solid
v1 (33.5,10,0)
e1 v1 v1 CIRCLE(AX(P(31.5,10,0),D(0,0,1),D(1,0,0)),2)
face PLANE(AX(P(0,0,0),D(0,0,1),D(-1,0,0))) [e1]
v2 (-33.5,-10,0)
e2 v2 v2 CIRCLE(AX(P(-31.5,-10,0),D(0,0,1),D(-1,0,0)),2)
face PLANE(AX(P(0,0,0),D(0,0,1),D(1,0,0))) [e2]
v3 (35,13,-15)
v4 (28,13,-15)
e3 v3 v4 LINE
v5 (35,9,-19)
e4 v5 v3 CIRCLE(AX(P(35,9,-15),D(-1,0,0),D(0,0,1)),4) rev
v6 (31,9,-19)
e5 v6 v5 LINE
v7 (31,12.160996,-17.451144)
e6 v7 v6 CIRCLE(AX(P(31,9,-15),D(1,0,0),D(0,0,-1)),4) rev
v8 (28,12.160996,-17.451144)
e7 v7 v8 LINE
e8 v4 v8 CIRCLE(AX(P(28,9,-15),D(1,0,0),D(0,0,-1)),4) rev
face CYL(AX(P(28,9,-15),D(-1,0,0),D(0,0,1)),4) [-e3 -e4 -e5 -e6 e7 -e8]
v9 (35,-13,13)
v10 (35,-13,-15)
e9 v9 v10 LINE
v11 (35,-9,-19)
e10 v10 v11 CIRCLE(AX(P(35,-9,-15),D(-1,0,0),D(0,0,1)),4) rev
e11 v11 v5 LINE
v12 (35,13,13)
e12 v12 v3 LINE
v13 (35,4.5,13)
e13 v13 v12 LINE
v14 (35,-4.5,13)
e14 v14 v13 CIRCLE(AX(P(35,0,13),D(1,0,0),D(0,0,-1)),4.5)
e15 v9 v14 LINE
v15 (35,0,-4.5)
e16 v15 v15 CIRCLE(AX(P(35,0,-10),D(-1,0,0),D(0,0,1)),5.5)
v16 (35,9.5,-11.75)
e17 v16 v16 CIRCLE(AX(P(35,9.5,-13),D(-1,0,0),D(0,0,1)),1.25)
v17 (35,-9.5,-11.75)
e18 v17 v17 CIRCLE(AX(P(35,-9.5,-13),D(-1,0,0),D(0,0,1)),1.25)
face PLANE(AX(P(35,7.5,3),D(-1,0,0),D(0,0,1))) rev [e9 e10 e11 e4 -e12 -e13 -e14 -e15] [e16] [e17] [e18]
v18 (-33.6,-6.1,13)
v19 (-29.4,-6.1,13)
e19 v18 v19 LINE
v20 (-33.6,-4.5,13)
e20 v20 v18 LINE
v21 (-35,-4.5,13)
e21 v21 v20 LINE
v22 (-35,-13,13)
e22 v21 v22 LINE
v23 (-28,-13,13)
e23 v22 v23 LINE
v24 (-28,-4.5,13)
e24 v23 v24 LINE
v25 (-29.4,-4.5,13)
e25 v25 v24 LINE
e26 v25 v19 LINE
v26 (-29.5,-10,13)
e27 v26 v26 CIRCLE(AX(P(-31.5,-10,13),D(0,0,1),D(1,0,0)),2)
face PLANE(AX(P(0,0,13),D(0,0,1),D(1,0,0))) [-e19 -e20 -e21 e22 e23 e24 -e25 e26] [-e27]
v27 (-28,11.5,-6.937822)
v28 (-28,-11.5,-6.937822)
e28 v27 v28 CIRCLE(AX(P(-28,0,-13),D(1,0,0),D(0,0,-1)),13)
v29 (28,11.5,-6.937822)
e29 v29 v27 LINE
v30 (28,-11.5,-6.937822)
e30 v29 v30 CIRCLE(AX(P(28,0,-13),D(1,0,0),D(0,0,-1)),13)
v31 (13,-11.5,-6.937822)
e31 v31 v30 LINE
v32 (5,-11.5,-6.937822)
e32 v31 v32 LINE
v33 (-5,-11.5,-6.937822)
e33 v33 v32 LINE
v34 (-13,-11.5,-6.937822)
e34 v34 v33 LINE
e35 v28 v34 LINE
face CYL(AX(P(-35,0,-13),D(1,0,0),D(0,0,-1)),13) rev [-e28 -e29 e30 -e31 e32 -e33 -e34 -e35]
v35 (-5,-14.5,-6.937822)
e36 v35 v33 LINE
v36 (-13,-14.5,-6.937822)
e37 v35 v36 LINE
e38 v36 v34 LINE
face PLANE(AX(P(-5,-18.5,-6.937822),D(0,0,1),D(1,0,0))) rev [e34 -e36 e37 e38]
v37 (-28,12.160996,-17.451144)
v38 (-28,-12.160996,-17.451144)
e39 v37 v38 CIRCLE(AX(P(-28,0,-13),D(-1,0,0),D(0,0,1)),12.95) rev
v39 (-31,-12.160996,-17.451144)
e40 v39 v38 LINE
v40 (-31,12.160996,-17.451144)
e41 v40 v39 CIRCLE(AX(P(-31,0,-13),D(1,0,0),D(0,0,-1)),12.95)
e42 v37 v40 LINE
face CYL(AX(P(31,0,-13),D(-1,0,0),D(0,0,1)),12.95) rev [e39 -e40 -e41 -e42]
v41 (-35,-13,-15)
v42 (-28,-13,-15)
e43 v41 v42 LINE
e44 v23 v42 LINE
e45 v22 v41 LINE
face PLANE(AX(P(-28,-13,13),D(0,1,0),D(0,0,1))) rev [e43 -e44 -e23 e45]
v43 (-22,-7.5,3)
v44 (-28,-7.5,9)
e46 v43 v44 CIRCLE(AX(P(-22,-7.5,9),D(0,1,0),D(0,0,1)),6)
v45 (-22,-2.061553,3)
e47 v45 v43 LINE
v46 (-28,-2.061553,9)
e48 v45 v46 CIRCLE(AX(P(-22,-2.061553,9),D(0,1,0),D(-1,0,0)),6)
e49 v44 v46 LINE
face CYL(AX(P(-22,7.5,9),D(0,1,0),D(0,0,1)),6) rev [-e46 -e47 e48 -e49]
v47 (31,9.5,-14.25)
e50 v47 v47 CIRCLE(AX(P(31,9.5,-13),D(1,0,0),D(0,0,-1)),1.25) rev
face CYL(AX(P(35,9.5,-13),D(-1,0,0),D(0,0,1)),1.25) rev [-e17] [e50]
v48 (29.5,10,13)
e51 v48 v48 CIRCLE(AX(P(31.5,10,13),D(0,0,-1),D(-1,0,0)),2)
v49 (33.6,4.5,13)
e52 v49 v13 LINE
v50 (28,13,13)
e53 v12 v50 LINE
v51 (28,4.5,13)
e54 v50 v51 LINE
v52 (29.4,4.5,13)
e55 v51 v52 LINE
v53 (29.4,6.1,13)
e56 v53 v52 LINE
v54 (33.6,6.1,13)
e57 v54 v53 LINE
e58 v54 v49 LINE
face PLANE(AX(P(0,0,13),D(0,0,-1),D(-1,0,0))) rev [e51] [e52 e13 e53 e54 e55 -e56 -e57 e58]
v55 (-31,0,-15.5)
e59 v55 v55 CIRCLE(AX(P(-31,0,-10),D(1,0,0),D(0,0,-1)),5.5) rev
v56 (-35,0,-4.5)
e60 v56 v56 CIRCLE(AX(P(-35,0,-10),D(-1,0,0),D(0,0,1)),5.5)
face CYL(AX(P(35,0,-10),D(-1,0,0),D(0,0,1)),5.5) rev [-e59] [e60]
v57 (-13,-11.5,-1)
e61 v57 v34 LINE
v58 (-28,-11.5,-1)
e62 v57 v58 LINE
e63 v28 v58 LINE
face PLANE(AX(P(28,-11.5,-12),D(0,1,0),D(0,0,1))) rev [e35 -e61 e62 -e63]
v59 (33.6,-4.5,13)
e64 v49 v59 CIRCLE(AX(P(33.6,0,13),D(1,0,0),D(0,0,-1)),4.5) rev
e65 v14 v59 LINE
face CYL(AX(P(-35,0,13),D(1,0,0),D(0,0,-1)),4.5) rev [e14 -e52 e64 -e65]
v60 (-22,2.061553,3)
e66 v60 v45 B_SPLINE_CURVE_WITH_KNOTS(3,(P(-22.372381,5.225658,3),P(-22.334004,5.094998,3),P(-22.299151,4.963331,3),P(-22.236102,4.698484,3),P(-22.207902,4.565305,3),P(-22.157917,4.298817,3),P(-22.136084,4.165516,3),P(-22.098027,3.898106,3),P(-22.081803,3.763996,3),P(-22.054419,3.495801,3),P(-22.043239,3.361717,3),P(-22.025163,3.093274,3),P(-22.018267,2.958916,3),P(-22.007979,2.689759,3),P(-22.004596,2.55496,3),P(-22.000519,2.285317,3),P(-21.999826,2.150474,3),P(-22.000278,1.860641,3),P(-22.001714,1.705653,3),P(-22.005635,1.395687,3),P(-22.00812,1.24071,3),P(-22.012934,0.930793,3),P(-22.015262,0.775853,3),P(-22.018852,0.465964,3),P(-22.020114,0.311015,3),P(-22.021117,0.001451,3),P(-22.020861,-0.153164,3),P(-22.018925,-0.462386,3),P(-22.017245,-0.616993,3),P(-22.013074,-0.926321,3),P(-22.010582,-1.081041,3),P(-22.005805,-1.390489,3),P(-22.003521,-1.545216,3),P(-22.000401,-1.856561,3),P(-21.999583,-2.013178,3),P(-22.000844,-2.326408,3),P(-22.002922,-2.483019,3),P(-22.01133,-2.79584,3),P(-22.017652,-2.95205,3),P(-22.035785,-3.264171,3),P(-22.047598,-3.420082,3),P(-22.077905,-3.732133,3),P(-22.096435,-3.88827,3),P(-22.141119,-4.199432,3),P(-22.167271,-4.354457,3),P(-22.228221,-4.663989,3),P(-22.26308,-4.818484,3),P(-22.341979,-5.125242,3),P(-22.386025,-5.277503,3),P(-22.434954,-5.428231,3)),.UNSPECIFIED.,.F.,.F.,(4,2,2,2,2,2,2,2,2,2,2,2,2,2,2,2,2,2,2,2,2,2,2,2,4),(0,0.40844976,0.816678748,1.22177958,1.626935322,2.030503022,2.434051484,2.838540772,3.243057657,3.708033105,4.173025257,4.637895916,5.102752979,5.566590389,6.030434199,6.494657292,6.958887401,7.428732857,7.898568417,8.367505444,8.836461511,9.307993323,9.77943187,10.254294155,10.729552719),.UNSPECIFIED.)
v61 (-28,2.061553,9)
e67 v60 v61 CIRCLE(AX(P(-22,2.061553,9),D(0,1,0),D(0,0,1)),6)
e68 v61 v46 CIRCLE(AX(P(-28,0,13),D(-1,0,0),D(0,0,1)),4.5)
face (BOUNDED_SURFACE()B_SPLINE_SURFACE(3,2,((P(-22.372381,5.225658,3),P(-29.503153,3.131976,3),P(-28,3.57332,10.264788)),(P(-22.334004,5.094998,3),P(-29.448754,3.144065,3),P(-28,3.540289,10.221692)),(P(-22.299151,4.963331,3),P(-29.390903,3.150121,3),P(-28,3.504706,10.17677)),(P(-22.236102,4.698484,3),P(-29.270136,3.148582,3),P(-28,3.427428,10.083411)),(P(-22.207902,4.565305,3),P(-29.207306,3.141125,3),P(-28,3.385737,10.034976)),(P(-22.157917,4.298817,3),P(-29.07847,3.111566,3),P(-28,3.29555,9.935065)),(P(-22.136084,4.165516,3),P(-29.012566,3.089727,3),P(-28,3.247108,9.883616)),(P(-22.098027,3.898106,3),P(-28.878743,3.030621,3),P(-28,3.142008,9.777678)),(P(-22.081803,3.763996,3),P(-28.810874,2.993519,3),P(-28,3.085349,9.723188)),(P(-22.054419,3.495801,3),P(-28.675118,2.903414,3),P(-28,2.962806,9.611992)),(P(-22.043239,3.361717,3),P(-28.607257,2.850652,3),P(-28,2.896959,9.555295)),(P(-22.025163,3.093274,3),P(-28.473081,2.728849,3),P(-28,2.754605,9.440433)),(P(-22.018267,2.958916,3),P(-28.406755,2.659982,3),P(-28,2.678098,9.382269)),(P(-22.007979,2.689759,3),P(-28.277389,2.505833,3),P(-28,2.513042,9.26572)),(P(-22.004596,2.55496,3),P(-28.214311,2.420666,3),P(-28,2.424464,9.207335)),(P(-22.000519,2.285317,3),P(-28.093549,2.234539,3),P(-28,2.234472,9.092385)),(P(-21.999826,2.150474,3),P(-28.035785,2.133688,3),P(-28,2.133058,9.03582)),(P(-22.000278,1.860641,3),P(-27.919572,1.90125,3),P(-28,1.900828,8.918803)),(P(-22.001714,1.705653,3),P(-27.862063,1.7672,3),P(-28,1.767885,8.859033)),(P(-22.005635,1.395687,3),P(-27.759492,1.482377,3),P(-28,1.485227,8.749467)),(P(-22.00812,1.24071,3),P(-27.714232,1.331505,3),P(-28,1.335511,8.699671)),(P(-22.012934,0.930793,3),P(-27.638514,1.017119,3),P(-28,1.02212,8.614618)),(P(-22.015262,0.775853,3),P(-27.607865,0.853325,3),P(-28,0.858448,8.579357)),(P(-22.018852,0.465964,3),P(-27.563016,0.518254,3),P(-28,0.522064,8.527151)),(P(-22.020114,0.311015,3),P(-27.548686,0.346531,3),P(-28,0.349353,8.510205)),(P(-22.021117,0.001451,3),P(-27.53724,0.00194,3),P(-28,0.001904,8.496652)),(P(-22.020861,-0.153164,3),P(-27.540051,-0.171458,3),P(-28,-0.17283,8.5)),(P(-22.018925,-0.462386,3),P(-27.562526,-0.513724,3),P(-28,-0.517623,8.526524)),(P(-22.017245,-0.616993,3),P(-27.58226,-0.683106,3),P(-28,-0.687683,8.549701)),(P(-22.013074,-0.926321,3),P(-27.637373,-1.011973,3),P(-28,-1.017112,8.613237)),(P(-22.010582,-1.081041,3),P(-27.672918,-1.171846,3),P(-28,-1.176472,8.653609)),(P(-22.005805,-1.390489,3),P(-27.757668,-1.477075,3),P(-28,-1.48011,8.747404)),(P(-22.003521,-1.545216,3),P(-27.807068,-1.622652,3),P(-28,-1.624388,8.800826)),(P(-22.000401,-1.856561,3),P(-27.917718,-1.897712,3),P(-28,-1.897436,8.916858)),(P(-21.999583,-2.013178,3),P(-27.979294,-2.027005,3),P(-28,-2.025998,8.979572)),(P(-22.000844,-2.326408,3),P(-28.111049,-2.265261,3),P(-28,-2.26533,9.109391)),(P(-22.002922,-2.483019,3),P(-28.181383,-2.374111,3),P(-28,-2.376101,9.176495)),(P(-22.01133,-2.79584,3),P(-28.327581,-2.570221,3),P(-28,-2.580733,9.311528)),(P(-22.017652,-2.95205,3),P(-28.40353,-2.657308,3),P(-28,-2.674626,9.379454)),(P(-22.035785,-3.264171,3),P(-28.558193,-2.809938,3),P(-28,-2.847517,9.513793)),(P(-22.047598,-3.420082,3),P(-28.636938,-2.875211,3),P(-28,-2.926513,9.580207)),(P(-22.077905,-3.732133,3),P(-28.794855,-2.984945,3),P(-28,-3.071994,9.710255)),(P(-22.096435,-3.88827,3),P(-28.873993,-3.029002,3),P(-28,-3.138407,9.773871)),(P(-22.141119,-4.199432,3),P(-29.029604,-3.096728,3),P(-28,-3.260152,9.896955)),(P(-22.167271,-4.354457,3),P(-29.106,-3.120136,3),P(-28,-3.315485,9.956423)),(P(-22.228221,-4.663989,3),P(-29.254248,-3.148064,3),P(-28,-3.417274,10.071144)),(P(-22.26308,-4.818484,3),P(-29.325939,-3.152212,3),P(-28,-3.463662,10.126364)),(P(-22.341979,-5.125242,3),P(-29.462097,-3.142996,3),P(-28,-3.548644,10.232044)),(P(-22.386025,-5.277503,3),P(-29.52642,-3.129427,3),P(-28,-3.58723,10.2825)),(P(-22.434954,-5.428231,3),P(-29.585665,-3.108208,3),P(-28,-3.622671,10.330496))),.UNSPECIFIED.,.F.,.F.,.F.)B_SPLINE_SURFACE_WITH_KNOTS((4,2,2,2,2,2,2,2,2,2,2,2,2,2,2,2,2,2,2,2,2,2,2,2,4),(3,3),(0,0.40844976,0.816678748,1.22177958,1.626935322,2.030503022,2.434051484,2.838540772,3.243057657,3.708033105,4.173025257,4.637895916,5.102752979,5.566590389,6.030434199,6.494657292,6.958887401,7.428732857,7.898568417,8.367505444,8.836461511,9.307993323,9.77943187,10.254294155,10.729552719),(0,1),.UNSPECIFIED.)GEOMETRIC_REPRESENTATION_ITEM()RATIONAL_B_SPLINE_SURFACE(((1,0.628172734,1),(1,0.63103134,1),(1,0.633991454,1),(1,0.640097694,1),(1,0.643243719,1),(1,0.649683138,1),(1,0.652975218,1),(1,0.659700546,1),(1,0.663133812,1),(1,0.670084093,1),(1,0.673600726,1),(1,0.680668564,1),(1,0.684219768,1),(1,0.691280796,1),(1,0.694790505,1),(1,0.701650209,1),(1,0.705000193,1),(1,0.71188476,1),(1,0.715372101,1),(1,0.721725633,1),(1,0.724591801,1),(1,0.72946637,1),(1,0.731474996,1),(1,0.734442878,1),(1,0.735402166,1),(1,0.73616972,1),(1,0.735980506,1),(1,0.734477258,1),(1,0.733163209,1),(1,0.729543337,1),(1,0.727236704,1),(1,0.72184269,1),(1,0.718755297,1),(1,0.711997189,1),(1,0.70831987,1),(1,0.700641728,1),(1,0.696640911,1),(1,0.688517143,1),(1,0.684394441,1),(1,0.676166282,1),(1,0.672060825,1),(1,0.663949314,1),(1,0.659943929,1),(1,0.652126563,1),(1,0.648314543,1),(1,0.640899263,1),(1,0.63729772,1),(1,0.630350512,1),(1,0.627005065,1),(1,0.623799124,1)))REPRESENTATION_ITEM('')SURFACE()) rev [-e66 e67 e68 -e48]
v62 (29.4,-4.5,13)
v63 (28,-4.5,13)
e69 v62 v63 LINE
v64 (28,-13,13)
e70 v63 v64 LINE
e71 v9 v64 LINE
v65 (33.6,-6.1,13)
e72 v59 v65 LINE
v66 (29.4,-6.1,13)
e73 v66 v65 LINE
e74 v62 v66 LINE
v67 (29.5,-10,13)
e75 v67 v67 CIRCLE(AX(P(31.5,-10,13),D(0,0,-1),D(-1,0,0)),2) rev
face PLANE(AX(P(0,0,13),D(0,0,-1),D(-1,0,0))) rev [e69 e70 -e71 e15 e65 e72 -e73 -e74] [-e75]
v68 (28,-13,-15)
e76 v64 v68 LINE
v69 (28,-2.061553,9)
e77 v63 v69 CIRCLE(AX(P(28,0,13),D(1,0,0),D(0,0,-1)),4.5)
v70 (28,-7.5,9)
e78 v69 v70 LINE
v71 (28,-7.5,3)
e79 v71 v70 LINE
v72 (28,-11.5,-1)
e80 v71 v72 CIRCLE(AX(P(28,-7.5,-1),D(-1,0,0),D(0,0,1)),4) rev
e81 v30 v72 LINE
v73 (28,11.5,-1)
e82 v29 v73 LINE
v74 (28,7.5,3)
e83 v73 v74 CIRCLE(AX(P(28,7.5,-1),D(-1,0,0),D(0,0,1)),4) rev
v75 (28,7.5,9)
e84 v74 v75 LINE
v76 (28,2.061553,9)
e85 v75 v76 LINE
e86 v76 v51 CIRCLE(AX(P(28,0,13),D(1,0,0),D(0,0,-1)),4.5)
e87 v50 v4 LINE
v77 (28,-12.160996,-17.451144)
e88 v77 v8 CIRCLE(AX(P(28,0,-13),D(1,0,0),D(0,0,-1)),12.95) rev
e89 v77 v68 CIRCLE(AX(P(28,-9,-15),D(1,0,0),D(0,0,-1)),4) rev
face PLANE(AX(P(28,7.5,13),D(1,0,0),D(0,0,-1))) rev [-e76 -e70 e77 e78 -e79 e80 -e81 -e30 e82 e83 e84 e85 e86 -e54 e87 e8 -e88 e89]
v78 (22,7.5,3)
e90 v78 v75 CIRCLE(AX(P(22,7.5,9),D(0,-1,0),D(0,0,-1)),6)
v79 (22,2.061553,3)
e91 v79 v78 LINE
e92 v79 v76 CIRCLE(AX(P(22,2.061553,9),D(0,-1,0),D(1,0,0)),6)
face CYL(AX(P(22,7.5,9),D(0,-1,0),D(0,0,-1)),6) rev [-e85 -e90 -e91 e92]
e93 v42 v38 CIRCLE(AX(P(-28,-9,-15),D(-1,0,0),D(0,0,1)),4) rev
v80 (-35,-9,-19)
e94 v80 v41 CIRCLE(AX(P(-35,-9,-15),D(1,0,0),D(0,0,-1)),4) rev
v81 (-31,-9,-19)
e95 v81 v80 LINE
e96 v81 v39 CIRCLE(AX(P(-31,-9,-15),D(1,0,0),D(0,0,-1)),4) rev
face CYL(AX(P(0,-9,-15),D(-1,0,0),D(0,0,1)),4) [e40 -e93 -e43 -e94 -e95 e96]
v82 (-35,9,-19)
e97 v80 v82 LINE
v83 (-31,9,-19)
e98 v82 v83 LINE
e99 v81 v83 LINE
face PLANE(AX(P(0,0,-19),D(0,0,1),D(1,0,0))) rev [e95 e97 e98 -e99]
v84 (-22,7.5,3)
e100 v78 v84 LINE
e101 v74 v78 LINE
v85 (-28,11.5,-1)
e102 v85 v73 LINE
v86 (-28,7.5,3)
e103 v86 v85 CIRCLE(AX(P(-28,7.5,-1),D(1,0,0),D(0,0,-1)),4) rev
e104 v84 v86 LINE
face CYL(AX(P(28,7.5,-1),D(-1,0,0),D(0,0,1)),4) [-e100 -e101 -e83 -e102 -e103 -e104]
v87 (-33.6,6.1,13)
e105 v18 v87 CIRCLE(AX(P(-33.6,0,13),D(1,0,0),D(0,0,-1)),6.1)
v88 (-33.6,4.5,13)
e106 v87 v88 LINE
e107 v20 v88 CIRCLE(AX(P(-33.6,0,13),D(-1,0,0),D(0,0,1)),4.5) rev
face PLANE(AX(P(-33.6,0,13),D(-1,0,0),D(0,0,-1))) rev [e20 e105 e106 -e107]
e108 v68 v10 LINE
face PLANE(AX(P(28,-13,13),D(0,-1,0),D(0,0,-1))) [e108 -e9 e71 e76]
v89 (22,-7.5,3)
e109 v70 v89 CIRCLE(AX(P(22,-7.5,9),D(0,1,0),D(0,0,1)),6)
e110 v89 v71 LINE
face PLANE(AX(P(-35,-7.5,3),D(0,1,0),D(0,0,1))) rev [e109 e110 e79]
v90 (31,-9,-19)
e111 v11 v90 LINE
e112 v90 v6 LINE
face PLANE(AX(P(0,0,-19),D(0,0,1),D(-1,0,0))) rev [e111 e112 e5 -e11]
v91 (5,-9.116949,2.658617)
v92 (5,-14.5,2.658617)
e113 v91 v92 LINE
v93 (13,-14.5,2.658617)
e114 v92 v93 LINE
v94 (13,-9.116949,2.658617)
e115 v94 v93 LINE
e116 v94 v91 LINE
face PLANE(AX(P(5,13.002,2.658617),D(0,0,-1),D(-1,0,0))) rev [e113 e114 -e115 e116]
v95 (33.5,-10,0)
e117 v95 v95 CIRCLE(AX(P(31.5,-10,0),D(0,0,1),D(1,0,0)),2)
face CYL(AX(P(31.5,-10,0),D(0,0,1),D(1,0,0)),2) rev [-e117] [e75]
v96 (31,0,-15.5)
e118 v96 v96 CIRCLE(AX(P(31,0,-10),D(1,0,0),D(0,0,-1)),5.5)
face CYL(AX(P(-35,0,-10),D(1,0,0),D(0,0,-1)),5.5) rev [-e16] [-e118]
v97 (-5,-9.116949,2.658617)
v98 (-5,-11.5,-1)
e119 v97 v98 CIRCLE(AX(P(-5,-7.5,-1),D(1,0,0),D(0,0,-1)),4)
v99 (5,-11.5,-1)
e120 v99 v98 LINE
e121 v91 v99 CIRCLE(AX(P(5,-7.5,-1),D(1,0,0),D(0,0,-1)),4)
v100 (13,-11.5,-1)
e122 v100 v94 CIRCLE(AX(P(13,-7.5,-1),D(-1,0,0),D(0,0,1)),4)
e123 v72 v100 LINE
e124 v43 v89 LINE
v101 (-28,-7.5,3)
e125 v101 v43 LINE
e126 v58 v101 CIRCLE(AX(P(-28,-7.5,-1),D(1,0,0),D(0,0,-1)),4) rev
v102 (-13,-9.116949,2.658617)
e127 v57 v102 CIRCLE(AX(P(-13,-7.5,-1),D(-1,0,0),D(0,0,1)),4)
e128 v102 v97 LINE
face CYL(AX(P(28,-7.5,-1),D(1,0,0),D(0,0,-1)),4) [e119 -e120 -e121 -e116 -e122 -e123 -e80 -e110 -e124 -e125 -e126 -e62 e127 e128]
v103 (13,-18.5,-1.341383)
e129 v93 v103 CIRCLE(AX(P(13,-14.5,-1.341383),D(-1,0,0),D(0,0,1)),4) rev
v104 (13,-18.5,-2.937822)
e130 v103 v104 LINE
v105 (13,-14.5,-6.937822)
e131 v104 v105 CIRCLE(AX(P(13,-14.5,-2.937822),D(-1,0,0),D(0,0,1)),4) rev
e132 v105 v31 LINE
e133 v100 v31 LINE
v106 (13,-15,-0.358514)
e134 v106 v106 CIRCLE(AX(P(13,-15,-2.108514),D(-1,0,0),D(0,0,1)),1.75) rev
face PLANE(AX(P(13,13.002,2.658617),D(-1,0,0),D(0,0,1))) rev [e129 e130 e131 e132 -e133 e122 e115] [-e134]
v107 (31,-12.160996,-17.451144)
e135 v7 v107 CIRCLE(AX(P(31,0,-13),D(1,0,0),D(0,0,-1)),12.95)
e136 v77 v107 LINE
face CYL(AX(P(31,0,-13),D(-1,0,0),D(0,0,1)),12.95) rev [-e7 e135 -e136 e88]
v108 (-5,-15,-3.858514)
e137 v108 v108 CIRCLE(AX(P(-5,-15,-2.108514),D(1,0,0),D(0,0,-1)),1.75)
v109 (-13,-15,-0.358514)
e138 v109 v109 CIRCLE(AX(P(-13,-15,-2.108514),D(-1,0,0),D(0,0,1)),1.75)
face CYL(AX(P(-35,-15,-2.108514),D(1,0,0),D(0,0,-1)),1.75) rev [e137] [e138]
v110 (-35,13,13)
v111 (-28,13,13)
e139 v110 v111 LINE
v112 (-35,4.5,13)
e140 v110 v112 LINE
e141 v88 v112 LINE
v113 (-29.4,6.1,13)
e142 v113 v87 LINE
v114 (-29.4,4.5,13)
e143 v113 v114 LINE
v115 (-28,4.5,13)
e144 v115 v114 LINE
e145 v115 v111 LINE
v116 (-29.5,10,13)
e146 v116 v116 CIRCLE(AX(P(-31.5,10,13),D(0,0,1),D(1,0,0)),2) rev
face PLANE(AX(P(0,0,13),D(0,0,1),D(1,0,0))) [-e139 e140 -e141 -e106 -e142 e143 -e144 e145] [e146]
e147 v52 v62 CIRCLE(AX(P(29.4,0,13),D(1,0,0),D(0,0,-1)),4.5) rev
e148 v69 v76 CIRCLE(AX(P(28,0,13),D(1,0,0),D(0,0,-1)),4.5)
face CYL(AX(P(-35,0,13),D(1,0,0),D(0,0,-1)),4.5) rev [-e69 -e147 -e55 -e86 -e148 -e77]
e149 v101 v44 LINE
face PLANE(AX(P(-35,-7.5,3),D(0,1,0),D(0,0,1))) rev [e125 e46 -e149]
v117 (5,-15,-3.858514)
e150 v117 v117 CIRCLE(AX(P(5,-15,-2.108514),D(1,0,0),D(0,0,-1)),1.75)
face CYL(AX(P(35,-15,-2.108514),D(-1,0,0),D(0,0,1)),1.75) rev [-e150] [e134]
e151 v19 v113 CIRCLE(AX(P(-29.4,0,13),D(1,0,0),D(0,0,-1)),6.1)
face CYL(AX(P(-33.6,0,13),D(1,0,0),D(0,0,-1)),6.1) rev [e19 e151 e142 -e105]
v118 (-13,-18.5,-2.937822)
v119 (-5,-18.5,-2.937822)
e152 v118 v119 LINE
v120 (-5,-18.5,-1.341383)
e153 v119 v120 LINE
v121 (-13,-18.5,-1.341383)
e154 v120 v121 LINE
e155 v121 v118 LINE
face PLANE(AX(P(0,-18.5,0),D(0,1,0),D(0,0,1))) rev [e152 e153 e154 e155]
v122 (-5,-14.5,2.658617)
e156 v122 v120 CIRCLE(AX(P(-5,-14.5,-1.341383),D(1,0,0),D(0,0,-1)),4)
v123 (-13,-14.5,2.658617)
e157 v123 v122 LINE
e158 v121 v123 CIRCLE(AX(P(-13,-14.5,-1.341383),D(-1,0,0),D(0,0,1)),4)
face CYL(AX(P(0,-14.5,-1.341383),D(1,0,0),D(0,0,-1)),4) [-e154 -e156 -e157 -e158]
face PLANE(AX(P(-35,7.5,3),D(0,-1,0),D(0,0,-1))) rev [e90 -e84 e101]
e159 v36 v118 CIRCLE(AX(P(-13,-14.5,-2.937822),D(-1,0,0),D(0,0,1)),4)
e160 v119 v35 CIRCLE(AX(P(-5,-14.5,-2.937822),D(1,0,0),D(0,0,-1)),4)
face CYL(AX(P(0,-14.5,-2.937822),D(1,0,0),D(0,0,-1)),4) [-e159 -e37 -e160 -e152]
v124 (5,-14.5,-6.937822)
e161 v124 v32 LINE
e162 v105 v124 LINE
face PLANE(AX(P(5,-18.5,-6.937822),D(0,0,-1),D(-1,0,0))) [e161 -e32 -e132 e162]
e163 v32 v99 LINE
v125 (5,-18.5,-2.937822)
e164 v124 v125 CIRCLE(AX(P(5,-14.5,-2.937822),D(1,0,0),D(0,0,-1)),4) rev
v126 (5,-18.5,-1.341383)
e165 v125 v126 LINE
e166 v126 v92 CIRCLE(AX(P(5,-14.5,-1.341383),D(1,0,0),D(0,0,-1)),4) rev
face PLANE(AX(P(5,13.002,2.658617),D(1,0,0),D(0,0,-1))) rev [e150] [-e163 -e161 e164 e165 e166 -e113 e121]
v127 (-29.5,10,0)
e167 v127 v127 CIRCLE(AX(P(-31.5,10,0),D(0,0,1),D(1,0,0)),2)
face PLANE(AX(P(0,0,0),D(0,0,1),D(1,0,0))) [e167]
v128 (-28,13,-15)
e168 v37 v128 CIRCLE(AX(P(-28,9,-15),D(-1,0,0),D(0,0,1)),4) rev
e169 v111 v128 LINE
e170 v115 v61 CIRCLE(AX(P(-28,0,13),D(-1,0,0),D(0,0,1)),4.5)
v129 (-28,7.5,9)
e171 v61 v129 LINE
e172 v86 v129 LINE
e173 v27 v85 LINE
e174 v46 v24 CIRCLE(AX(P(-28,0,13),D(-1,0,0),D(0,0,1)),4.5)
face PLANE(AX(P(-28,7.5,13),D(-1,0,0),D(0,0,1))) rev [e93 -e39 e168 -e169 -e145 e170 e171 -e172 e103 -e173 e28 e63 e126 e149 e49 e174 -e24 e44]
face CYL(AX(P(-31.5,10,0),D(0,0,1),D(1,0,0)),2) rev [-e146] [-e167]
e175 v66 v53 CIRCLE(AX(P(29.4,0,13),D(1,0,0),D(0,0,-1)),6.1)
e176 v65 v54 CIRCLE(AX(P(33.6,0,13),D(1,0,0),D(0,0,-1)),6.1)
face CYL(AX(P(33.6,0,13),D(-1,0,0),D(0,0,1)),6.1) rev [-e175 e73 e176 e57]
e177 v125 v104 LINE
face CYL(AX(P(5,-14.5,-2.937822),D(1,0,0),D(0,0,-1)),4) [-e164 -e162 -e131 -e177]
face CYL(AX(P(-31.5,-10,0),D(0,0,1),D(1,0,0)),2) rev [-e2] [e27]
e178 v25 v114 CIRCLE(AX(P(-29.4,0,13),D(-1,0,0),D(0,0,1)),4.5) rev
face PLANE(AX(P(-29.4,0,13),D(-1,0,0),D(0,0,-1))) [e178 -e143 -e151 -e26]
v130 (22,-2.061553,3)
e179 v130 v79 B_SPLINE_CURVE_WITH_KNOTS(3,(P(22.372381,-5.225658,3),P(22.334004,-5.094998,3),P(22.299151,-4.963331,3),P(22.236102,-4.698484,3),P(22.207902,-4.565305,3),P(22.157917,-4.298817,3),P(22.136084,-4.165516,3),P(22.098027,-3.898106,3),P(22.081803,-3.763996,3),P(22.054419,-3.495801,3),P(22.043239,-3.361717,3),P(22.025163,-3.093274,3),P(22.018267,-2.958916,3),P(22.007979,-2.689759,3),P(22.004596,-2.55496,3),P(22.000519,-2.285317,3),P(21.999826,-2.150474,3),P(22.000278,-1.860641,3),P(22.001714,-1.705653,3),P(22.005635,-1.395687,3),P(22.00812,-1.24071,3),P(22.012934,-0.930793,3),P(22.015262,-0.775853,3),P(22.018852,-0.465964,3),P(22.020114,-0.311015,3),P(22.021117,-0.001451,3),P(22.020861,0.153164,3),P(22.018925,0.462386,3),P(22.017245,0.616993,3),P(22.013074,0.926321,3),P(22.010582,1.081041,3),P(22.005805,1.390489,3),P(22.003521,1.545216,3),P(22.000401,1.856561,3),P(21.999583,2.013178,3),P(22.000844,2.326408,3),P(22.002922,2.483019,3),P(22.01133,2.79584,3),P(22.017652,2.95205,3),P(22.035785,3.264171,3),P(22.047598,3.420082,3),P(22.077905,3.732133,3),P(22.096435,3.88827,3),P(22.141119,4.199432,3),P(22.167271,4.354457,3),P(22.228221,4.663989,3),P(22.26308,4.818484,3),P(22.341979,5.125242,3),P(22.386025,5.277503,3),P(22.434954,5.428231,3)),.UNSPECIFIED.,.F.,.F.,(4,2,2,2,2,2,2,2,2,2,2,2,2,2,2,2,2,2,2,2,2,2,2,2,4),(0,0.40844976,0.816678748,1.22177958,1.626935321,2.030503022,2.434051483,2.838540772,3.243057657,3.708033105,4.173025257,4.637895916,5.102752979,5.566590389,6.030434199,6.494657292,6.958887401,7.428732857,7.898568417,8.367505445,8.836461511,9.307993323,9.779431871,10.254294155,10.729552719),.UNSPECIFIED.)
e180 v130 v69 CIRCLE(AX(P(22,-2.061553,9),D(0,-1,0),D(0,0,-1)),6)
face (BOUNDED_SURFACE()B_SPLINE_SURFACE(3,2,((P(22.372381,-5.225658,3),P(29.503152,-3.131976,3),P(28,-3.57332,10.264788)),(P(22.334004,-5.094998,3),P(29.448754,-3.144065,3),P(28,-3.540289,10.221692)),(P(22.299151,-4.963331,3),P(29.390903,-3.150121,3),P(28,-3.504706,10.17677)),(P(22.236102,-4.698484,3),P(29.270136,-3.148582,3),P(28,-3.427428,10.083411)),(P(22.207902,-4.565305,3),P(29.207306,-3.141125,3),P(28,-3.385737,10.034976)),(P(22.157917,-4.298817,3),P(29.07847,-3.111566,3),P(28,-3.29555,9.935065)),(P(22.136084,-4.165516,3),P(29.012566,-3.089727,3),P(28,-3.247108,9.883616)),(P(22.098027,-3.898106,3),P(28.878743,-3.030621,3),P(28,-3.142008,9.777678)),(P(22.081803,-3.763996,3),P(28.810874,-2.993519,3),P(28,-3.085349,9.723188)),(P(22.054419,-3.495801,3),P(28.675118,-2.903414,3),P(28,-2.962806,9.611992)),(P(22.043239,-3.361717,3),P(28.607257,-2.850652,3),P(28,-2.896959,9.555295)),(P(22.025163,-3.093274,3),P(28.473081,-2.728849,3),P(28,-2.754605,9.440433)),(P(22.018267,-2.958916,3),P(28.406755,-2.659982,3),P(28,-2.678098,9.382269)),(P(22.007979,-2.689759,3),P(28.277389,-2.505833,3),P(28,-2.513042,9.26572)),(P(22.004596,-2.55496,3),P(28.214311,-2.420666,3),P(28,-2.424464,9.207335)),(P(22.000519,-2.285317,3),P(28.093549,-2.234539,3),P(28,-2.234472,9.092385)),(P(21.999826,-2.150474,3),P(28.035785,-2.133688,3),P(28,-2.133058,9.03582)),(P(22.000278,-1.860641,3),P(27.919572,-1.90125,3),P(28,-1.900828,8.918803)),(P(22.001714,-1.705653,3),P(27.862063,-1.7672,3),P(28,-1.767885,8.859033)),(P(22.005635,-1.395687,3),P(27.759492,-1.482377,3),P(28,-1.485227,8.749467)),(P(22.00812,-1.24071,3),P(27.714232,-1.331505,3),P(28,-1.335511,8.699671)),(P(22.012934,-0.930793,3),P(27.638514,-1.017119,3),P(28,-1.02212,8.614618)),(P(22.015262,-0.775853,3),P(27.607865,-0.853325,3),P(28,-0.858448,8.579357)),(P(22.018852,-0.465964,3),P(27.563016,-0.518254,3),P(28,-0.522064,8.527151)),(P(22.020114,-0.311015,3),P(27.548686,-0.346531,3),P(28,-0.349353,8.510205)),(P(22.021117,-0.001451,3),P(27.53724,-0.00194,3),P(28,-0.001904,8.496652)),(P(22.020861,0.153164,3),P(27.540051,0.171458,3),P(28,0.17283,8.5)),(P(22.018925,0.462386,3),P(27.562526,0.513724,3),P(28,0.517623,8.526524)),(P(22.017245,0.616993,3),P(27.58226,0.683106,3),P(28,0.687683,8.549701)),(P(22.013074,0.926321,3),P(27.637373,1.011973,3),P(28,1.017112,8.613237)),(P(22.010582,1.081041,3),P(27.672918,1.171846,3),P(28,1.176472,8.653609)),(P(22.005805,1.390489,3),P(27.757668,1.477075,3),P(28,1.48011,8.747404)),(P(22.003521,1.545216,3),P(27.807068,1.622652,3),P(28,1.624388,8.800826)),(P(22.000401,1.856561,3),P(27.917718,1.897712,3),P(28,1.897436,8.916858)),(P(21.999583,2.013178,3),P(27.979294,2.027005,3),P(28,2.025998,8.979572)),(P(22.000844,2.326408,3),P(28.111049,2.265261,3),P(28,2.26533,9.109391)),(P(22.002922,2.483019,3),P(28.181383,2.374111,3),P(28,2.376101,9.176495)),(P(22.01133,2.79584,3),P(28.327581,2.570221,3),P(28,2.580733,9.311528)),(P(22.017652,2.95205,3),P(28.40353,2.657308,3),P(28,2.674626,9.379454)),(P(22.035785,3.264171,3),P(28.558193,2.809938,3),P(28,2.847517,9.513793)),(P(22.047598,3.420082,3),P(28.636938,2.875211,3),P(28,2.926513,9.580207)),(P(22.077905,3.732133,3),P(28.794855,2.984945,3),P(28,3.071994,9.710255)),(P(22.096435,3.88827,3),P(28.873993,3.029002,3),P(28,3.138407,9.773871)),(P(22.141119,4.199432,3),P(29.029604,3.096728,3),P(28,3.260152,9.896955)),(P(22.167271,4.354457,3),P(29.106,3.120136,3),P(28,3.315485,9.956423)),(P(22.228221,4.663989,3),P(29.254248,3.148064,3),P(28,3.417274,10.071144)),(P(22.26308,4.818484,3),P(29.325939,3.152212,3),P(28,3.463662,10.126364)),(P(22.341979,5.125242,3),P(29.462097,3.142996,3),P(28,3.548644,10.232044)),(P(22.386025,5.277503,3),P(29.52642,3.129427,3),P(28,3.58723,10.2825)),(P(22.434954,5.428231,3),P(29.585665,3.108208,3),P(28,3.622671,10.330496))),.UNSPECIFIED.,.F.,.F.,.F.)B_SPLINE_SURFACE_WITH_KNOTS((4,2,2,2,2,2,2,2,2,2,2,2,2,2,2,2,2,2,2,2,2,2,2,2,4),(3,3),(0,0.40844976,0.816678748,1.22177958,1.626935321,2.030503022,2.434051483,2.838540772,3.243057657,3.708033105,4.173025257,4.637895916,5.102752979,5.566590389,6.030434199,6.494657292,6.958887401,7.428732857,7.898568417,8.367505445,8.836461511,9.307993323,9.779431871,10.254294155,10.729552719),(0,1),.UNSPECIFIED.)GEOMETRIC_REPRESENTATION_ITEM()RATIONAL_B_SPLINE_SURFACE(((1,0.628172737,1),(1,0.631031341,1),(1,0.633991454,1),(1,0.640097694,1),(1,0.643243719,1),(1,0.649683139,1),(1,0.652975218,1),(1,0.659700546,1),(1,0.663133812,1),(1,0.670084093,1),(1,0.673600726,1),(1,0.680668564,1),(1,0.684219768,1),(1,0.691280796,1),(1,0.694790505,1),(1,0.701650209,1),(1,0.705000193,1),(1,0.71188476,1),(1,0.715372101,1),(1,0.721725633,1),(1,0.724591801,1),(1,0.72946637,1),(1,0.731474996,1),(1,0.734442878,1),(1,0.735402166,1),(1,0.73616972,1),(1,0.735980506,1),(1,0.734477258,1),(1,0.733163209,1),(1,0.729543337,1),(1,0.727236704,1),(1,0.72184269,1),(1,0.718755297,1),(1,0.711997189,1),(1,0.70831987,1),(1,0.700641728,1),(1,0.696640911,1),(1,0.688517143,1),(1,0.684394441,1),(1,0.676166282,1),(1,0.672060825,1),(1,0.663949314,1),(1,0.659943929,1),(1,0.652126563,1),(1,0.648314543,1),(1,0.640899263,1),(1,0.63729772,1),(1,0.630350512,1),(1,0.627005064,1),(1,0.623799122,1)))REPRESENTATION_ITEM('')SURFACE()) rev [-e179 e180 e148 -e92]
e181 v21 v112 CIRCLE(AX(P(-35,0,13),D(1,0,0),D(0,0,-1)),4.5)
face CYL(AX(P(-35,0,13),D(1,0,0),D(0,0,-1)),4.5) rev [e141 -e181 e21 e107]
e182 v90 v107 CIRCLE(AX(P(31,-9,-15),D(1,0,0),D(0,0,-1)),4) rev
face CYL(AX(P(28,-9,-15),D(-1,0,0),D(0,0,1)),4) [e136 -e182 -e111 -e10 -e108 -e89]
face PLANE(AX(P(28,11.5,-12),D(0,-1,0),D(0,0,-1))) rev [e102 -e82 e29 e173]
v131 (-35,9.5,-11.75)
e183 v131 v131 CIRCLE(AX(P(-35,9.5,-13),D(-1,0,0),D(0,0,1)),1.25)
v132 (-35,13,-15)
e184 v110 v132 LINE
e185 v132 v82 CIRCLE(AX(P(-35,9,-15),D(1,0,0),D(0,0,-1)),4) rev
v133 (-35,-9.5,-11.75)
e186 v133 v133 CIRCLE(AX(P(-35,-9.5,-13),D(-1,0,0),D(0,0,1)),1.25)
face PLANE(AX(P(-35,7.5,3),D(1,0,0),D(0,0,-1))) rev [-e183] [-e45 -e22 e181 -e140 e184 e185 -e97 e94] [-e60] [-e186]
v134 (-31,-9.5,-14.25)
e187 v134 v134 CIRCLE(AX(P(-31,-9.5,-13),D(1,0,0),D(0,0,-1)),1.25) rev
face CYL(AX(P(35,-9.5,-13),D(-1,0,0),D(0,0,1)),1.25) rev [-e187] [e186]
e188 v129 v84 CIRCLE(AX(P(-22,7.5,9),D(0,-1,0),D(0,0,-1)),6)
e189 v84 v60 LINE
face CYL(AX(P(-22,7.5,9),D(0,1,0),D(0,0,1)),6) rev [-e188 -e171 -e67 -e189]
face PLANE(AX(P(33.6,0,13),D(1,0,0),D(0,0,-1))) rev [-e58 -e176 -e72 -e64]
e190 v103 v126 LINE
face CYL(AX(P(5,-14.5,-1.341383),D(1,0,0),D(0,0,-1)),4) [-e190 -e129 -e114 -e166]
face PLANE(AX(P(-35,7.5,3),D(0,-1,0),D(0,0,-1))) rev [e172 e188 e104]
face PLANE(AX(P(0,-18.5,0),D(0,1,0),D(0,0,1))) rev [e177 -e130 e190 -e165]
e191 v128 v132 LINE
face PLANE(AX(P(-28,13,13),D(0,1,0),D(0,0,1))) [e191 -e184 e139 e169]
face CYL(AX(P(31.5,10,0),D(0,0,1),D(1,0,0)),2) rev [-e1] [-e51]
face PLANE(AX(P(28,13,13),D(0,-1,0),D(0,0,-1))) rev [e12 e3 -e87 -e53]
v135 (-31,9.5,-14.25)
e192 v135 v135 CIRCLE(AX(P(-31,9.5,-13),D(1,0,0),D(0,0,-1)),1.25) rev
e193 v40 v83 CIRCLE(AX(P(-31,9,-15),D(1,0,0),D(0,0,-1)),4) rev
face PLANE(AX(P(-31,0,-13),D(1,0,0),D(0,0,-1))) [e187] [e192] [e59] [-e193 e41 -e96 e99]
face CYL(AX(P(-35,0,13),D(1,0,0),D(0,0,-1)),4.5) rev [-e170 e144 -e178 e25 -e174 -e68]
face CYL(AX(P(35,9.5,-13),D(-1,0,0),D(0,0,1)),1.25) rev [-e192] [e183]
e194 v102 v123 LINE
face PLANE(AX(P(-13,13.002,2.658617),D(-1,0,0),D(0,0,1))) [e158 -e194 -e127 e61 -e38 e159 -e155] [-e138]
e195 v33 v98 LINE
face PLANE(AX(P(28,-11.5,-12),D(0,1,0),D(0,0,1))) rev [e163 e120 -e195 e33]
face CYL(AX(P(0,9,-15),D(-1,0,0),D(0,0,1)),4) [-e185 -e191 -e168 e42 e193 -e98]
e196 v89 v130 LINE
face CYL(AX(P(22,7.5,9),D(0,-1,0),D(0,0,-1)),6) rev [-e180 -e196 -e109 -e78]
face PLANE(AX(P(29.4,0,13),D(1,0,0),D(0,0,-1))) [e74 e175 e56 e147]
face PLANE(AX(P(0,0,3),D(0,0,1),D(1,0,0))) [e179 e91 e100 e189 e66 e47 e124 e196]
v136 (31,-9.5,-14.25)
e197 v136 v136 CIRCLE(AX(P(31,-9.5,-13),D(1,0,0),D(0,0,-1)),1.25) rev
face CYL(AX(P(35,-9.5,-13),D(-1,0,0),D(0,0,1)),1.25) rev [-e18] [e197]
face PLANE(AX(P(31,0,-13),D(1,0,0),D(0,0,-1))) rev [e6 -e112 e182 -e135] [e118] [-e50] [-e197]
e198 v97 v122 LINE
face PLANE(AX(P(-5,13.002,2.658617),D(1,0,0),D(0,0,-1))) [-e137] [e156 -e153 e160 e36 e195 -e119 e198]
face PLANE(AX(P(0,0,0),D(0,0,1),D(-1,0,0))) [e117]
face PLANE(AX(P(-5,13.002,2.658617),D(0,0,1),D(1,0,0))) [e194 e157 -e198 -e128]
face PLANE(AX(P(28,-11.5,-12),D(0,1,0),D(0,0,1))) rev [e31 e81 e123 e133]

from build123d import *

# Parameters (mm, degrees)
SKETCH1_W                                  = 70
SKETCH1_H                                  = 15
BOSS_EXTRUDE1_DEPTH                        = 3
SKETCH2_W                                  = 7
SKETCH2_H                                  = 15
BOSS_EXTRUDE2_DEPTH                        = 10
SKETCH5_R                                  = 4.5
CUT_EXTRUDE1_DEPTH                         = 72.590851371
SKETCH6_R                                  = 6.1
CUT_EXTRUDE4_DEPTH                         = 2.1
BOSS_EXTRUDE3_DEPTH                        = 13
SKETCH8_R                                  = 2
CUT_EXTRUDE5_DEPTH                         = 40.534794802
SKETCH9_R                                  = 1.75
CUT_EXTRUDE6_DEPTH                         = 39.65229618
MIRROR1_AT_THE_SECOND_PLANE_COPY_1_SKETC_R = 6.1
MIRROR1_AT_THE_SECOND_PLANE_COPY_1_DEPTH   = 2.1
MIRROR1_AT_THE_SECOND_PLANE_COPY_2_DEPTH   = 13
MIRROR1_AT_THE_SECOND_PLANE_COPY_3_SKETC_R = 2
MIRROR1_AT_THE_SECOND_PLANE_COPY_3_DEPTH   = 40.534794802
MIRROR1_AT_THE_SECOND_PLANE_COPY_4_SKETC_R = 1.75
MIRROR1_AT_THE_SECOND_PLANE_COPY_4_DEPTH   = 39.65229618
FILLET1_R                                  = 6
SKETCH10_W                                 = 56
SKETCH10_H                                 = 23
BOSS_EXTRUDE4_DEPTH                        = 15
FILLET2_R                                  = 4
SKETCH11_R                                 = 13
CUT_EXTRUDE7_DEPTH                         = 66.627738058
SKETCH12_W                                 = 8
SKETCH12_H                                 = 9.596439054
BOSS_EXTRUDE5_DEPTH                        = 7
BOSS_EXTRUDE5_DIRECTION_2_REACH            = 46.657
FILLET3_R                                  = 4
SKETCH13_R                                 = 1.75
CUT_EXTRUDE8_DEPTH                         = 46.948340586
SKETCH14_W                                 = 7
SKETCH14_H                                 = 26
BOSS_EXTRUDE6_DEPTH                        = 5
SKETCH15_W                                 = 7
SKETCH15_H                                 = 26
BOSS_EXTRUDE7_DEPTH                        = 14
FILLET5_R                                  = 4
SKETCH16_R                                 = 5.5
CUT_EXTRUDE9_DEPTH                         = 75.854859562
FILLET3_OF_MIRROR2_R                       = 4
FILLET5_OF_MIRROR2_R                       = 4
SKETCH17_R                                 = 1.25
CUT_EXTRUDE10_DEPTH                        = 75.854859562
CUT_EXTRUDE14_DEPTH                        = 31
CUT_EXTRUDE14_DEPTH_BACK                   = 31
SKETCH18_R                                 = 12.95


with BuildPart() as part:
    # Sketch1 → Boss-Extrude1 (new body)
    with BuildSketch(Plane.XY):
        Rectangle(SKETCH1_W, SKETCH1_H)
    extrude(amount=BOSS_EXTRUDE1_DEPTH)

    # Sketch2 → Boss-Extrude2 (add)
    with BuildSketch(Plane.XY.offset(3)):
        with Locations((-31.5, 0)):
            Rectangle(SKETCH2_W, SKETCH2_H)
        with Locations((31.5, 0)):
            Rectangle(SKETCH2_W, SKETCH2_H)
    extrude(amount=BOSS_EXTRUDE2_DEPTH)

    # Sketch5 → Cut-Extrude1 (cut, through all)
    with BuildSketch(Plane(origin=(35, 0, 0), x_dir=(0, 0, -1), z_dir=(1, 0, 0))):
        with Locations((-13, 0)):
            Circle(SKETCH5_R)
    extrude(amount=-CUT_EXTRUDE1_DEPTH, mode=Mode.SUBTRACT)

    # Sketch6 → Cut-Extrude4 (cut, symmetric)
    with BuildSketch(Plane(origin=(31.5, 0, 0), x_dir=(0, 0, -1), z_dir=(1, 0, 0))):
        with Locations((-13, 0)):
            Circle(SKETCH6_R)
    cut_extrude4 = extrude(amount=CUT_EXTRUDE4_DEPTH, both=True, mode=Mode.SUBTRACT)

    # Sketch7 → Boss-Extrude3 (add)
    with BuildSketch(Plane.XY):
        Polygon((28, 8.1), (28, 13), (35, 13), (35, 8.1), (35, 4.5), (33.6, 4.5), (33.6, 6.1), (29.4, 6.1), (29.4, 4.5), (28, 4.5), align=None)
    boss_extrude3 = extrude(amount=BOSS_EXTRUDE3_DEPTH)

    # Sketch8 → Cut-Extrude5 (cut, symmetric)
    with BuildSketch(Plane.XY.offset(13)):
        with Locations((31.5, 10)):
            Circle(SKETCH8_R)
    cut_extrude5 = extrude(amount=CUT_EXTRUDE5_DEPTH, both=True, mode=Mode.SUBTRACT)

    # Sketch9 → Cut-Extrude6 (cut, through all)
    with BuildSketch(Plane.XY.offset(3)):
        with Locations((-10, -4)):
            Circle(SKETCH9_R)
    cut_extrude6 = extrude(amount=-CUT_EXTRUDE6_DEPTH, mode=Mode.SUBTRACT)

    # Mirror1: Cut-Extrude4, Boss-Extrude3, Cut-Extrude5, Cut-Extrude6 across plane
    add(cut_extrude4.mirror(Plane(origin=(0, 0, 0), x_dir=(0, 0, 1), z_dir=(1, 0, 0))), mode=Mode.SUBTRACT)
    add(boss_extrude3.mirror(Plane(origin=(0, 0, 0), x_dir=(0, 0, 1), z_dir=(1, 0, 0))))
    add(cut_extrude5.mirror(Plane(origin=(0, 0, 0), x_dir=(0, 0, 1), z_dir=(1, 0, 0))), mode=Mode.SUBTRACT)
    add(cut_extrude6.mirror(Plane(origin=(0, 0, 0), x_dir=(0, 0, 1), z_dir=(1, 0, 0))), mode=Mode.SUBTRACT)

    # Mirror1 at the second plane: Cut-Extrude4, Boss-Extrude3, Cut-Extrude5, Cut-Extrude6 across plane
    add(cut_extrude4.mirror(Plane.ZX), mode=Mode.SUBTRACT)
    add(boss_extrude3.mirror(Plane.ZX))
    add(cut_extrude5.mirror(Plane.ZX), mode=Mode.SUBTRACT)
    add(cut_extrude6.mirror(Plane.ZX), mode=Mode.SUBTRACT)

    # Mirror1 at the second plane copy 1 sketc → Mirror1 at the second plane copy 1 (cut, symmetric)
    with BuildSketch(Plane(origin=(-31.5, 0, 0), x_dir=(0, 0, -1), z_dir=(-1, 0, 0))):
        with Locations((-13, 0)):
            Circle(MIRROR1_AT_THE_SECOND_PLANE_COPY_1_SKETC_R)
    extrude(amount=MIRROR1_AT_THE_SECOND_PLANE_COPY_1_DEPTH, both=True, mode=Mode.SUBTRACT)

    # Mirror1 at the second plane copy 2 sketc → Mirror1 at the second plane copy 2 (add)
    with BuildSketch(Plane(origin=(0, 0, 0), x_dir=(-1, 0, 0), z_dir=(0, 0, 1))):
        Polygon((28, 8.1), (28, 13), (35, 13), (35, 8.1), (35, 4.5), (33.6, 4.5), (33.6, 6.1), (29.4, 6.1), (29.4, 4.5), (28, 4.5), align=None)
    extrude(amount=MIRROR1_AT_THE_SECOND_PLANE_COPY_2_DEPTH)

    # Mirror1 at the second plane copy 3 sketc → Mirror1 at the second plane copy 3 (cut, symmetric)
    with BuildSketch(Plane(origin=(0, 0, 13), x_dir=(-1, 0, 0), z_dir=(0, 0, 1))):
        with Locations((31.5, 10)):
            Circle(MIRROR1_AT_THE_SECOND_PLANE_COPY_3_SKETC_R)
    extrude(amount=MIRROR1_AT_THE_SECOND_PLANE_COPY_3_DEPTH, both=True, mode=Mode.SUBTRACT)

    # Mirror1 at the second plane copy 4 sketc → Mirror1 at the second plane copy 4 (cut, through all)
    with BuildSketch(Plane(origin=(0, 0, 3), x_dir=(-1, 0, 0), z_dir=(0, 0, 1))):
        with Locations((-10, -4)):
            Circle(MIRROR1_AT_THE_SECOND_PLANE_COPY_4_SKETC_R)
    extrude(amount=-MIRROR1_AT_THE_SECOND_PLANE_COPY_4_DEPTH, mode=Mode.SUBTRACT)

    # Fillet1
    fillet1_edges = [part.edges().sort_by_distance(p)[0] for p in [
        (-28, 0, 3),
        (28, 0, 3),
    ]]
    fillet(fillet1_edges, radius=FILLET1_R)

    # Sketch10 → Boss-Extrude4 (add)
    with BuildSketch(Plane(origin=(0, 0, 3), x_dir=(-1, 0, 0), z_dir=(0, 0, -1))):
        Rectangle(SKETCH10_W, SKETCH10_H)
    extrude(amount=BOSS_EXTRUDE4_DEPTH)

    # Fillet2
    # the kernel refuses this fillet: 4 mm, written as the material it takes off along each edge
    with BuildSketch(Plane(origin=(-28, 11.5, 3), x_dir=(0, 0, -1), z_dir=(1, 0, 0)), Plane(origin=(28, -11.5, 3), x_dir=(0, 0, -1), z_dir=(-1, 0, 0))) as fillet2_piece_1:
        with BuildLine():
            CenterArc((FILLET2_R, -FILLET2_R), FILLET2_R, 90, 90)
            Line((0, -FILLET2_R), (0, 0))
            Line((0, 0), (FILLET2_R, 0))
        make_face()
    extrude(amount=56, mode=Mode.SUBTRACT)

    # Sketch11 → Cut-Extrude7 (cut, through all)
    with BuildSketch(Plane(origin=(28, 0, 0), x_dir=(0, 0, -1), z_dir=(1, 0, 0))):
        with Locations((13, 0)):
            Circle(SKETCH11_R)
    extrude(amount=-CUT_EXTRUDE7_DEPTH, mode=Mode.SUBTRACT)

    # Sketch12 → Boss-Extrude5 (add)
    with BuildSketch(Plane.XZ.offset(11.5)):
        with Locations((-9, -2.139602647)):
            Rectangle(SKETCH12_W, SKETCH12_H)
    boss_extrude5 = extrude(amount=BOSS_EXTRUDE5_DEPTH)

    # Sketch12 → Boss-Extrude5 direction 2 (add, up to next)
    with BuildSketch(Plane.XZ.offset(11.5), mode=Mode.PRIVATE) as boss_extrude5_direction_2_sk1:
        with Locations((-9, -2.139602647)):
            Rectangle(SKETCH12_W, SKETCH12_H)
    boss_extrude5_direction_2_tool1 = extrude(boss_extrude5_direction_2_sk1.sketch, amount=-BOSS_EXTRUDE5_DIRECTION_2_REACH, mode=Mode.PRIVATE) - part.part
    boss_extrude5_direction_2 = boss_extrude5_direction_2_tool1.solids().sort_by_distance((-9, -11.5, -2.139603))[0]
    add(boss_extrude5_direction_2)

    # Fillet3
    fillet3_edges = [part.edges().sort_by_distance(p)[0] for p in [
        (-9, -18.5, 2.65861688),
        (-9, -18.5, -6.937822174),
    ]]
    fillet(fillet3_edges, radius=FILLET3_R)

    # Sketch13 → Cut-Extrude8 (cut, through all)
    with BuildSketch(Plane(origin=(-5, 0, 0), x_dir=(0, 0, -1), z_dir=(1, 0, 0))):
        with Locations((2.108513734, -15)):
            Circle(SKETCH13_R)
    cut_extrude8 = extrude(amount=-CUT_EXTRUDE8_DEPTH, mode=Mode.SUBTRACT)

    # Sketch14 → Boss-Extrude6 (add)
    with BuildSketch(Plane(origin=(0, 0, 0), x_dir=(-1, 0, 0), z_dir=(0, 0, -1))):
        with Locations((31.5, 0)):
            Rectangle(SKETCH14_W, SKETCH14_H)
    boss_extrude6 = extrude(amount=BOSS_EXTRUDE6_DEPTH)

    # Sketch15 → Boss-Extrude7 (add)
    with BuildSketch(Plane(origin=(0, 0, -5), x_dir=(-1, 0, 0), z_dir=(0, 0, -1))):
        with Locations((31.5, 0)):
            Rectangle(SKETCH15_W, SKETCH15_H)
    boss_extrude7 = extrude(amount=BOSS_EXTRUDE7_DEPTH)

    # Fillet5
    fillet5_edges = [part.edges().sort_by_distance(p)[0] for p in [
        (-31.5, 13, -19),
        (-31.5, -13, -19),
    ]]
    fillet(fillet5_edges, radius=FILLET5_R)

    # Sketch16 → Cut-Extrude9 (cut, through all)
    with BuildSketch(Plane.ZY.offset(35)):
        with Locations((-10, 0)):
            Circle(SKETCH16_R)
    cut_extrude9 = extrude(amount=-CUT_EXTRUDE9_DEPTH, mode=Mode.SUBTRACT)

    # Mirror2: Boss-Extrude5, Boss-Extrude5 direction 2, Cut-Extrude8, Boss-Extrude6, Boss-Extrude7, Cut-Extrude9 across plane
    add(boss_extrude5.mirror(Plane(origin=(0, 0, 0), x_dir=(0, 0, 1), z_dir=(1, 0, 0))))
    add(boss_extrude5_direction_2.mirror(Plane(origin=(0, 0, 0), x_dir=(0, 0, 1), z_dir=(1, 0, 0))))
    add(cut_extrude8.mirror(Plane(origin=(0, 0, 0), x_dir=(0, 0, 1), z_dir=(1, 0, 0))), mode=Mode.SUBTRACT)
    add(boss_extrude6.mirror(Plane(origin=(0, 0, 0), x_dir=(0, 0, 1), z_dir=(1, 0, 0))))
    add(boss_extrude7.mirror(Plane(origin=(0, 0, 0), x_dir=(0, 0, 1), z_dir=(1, 0, 0))))
    add(cut_extrude9.mirror(Plane(origin=(0, 0, 0), x_dir=(0, 0, 1), z_dir=(1, 0, 0))), mode=Mode.SUBTRACT)

    # Fillet3 of Mirror2
    fillet3_of_mirror2_edges = [part.edges().sort_by_distance(p)[0] for p in [
        (9, -18.5, 2.65861688),
        (9, -18.5, -6.937822174),
    ]]
    fillet(fillet3_of_mirror2_edges, radius=FILLET3_OF_MIRROR2_R)

    # Fillet5 of Mirror2
    fillet5_of_mirror2_edges = [part.edges().sort_by_distance(p)[0] for p in [
        (31.5, 13, -19),
        (31.5, -13, -19),
    ]]
    fillet(fillet5_of_mirror2_edges, radius=FILLET5_OF_MIRROR2_R)

    # Sketch17 → Cut-Extrude10 (cut, through all)
    with BuildSketch(Plane.ZY.offset(35)):
        with Locations((-13, 9.5)):
            Circle(SKETCH17_R)
        with Locations((-13, -9.5)):
            Circle(SKETCH17_R)
    extrude(amount=-CUT_EXTRUDE10_DEPTH, mode=Mode.SUBTRACT)

    # Sketch18 → Cut-Extrude14 (cut, two sides: drawn at the far end of the back side and taken through both)
    with BuildSketch(Plane(origin=(0, 0, 0), x_dir=(0, 0, -1), z_dir=(1, 0, 0)).offset(-CUT_EXTRUDE14_DEPTH_BACK)):
        with Locations((13, 0)):
            Circle(SKETCH18_R)
    extrude(amount=CUT_EXTRUDE14_DEPTH + CUT_EXTRUDE14_DEPTH_BACK, mode=Mode.SUBTRACT)


solid = part.part
